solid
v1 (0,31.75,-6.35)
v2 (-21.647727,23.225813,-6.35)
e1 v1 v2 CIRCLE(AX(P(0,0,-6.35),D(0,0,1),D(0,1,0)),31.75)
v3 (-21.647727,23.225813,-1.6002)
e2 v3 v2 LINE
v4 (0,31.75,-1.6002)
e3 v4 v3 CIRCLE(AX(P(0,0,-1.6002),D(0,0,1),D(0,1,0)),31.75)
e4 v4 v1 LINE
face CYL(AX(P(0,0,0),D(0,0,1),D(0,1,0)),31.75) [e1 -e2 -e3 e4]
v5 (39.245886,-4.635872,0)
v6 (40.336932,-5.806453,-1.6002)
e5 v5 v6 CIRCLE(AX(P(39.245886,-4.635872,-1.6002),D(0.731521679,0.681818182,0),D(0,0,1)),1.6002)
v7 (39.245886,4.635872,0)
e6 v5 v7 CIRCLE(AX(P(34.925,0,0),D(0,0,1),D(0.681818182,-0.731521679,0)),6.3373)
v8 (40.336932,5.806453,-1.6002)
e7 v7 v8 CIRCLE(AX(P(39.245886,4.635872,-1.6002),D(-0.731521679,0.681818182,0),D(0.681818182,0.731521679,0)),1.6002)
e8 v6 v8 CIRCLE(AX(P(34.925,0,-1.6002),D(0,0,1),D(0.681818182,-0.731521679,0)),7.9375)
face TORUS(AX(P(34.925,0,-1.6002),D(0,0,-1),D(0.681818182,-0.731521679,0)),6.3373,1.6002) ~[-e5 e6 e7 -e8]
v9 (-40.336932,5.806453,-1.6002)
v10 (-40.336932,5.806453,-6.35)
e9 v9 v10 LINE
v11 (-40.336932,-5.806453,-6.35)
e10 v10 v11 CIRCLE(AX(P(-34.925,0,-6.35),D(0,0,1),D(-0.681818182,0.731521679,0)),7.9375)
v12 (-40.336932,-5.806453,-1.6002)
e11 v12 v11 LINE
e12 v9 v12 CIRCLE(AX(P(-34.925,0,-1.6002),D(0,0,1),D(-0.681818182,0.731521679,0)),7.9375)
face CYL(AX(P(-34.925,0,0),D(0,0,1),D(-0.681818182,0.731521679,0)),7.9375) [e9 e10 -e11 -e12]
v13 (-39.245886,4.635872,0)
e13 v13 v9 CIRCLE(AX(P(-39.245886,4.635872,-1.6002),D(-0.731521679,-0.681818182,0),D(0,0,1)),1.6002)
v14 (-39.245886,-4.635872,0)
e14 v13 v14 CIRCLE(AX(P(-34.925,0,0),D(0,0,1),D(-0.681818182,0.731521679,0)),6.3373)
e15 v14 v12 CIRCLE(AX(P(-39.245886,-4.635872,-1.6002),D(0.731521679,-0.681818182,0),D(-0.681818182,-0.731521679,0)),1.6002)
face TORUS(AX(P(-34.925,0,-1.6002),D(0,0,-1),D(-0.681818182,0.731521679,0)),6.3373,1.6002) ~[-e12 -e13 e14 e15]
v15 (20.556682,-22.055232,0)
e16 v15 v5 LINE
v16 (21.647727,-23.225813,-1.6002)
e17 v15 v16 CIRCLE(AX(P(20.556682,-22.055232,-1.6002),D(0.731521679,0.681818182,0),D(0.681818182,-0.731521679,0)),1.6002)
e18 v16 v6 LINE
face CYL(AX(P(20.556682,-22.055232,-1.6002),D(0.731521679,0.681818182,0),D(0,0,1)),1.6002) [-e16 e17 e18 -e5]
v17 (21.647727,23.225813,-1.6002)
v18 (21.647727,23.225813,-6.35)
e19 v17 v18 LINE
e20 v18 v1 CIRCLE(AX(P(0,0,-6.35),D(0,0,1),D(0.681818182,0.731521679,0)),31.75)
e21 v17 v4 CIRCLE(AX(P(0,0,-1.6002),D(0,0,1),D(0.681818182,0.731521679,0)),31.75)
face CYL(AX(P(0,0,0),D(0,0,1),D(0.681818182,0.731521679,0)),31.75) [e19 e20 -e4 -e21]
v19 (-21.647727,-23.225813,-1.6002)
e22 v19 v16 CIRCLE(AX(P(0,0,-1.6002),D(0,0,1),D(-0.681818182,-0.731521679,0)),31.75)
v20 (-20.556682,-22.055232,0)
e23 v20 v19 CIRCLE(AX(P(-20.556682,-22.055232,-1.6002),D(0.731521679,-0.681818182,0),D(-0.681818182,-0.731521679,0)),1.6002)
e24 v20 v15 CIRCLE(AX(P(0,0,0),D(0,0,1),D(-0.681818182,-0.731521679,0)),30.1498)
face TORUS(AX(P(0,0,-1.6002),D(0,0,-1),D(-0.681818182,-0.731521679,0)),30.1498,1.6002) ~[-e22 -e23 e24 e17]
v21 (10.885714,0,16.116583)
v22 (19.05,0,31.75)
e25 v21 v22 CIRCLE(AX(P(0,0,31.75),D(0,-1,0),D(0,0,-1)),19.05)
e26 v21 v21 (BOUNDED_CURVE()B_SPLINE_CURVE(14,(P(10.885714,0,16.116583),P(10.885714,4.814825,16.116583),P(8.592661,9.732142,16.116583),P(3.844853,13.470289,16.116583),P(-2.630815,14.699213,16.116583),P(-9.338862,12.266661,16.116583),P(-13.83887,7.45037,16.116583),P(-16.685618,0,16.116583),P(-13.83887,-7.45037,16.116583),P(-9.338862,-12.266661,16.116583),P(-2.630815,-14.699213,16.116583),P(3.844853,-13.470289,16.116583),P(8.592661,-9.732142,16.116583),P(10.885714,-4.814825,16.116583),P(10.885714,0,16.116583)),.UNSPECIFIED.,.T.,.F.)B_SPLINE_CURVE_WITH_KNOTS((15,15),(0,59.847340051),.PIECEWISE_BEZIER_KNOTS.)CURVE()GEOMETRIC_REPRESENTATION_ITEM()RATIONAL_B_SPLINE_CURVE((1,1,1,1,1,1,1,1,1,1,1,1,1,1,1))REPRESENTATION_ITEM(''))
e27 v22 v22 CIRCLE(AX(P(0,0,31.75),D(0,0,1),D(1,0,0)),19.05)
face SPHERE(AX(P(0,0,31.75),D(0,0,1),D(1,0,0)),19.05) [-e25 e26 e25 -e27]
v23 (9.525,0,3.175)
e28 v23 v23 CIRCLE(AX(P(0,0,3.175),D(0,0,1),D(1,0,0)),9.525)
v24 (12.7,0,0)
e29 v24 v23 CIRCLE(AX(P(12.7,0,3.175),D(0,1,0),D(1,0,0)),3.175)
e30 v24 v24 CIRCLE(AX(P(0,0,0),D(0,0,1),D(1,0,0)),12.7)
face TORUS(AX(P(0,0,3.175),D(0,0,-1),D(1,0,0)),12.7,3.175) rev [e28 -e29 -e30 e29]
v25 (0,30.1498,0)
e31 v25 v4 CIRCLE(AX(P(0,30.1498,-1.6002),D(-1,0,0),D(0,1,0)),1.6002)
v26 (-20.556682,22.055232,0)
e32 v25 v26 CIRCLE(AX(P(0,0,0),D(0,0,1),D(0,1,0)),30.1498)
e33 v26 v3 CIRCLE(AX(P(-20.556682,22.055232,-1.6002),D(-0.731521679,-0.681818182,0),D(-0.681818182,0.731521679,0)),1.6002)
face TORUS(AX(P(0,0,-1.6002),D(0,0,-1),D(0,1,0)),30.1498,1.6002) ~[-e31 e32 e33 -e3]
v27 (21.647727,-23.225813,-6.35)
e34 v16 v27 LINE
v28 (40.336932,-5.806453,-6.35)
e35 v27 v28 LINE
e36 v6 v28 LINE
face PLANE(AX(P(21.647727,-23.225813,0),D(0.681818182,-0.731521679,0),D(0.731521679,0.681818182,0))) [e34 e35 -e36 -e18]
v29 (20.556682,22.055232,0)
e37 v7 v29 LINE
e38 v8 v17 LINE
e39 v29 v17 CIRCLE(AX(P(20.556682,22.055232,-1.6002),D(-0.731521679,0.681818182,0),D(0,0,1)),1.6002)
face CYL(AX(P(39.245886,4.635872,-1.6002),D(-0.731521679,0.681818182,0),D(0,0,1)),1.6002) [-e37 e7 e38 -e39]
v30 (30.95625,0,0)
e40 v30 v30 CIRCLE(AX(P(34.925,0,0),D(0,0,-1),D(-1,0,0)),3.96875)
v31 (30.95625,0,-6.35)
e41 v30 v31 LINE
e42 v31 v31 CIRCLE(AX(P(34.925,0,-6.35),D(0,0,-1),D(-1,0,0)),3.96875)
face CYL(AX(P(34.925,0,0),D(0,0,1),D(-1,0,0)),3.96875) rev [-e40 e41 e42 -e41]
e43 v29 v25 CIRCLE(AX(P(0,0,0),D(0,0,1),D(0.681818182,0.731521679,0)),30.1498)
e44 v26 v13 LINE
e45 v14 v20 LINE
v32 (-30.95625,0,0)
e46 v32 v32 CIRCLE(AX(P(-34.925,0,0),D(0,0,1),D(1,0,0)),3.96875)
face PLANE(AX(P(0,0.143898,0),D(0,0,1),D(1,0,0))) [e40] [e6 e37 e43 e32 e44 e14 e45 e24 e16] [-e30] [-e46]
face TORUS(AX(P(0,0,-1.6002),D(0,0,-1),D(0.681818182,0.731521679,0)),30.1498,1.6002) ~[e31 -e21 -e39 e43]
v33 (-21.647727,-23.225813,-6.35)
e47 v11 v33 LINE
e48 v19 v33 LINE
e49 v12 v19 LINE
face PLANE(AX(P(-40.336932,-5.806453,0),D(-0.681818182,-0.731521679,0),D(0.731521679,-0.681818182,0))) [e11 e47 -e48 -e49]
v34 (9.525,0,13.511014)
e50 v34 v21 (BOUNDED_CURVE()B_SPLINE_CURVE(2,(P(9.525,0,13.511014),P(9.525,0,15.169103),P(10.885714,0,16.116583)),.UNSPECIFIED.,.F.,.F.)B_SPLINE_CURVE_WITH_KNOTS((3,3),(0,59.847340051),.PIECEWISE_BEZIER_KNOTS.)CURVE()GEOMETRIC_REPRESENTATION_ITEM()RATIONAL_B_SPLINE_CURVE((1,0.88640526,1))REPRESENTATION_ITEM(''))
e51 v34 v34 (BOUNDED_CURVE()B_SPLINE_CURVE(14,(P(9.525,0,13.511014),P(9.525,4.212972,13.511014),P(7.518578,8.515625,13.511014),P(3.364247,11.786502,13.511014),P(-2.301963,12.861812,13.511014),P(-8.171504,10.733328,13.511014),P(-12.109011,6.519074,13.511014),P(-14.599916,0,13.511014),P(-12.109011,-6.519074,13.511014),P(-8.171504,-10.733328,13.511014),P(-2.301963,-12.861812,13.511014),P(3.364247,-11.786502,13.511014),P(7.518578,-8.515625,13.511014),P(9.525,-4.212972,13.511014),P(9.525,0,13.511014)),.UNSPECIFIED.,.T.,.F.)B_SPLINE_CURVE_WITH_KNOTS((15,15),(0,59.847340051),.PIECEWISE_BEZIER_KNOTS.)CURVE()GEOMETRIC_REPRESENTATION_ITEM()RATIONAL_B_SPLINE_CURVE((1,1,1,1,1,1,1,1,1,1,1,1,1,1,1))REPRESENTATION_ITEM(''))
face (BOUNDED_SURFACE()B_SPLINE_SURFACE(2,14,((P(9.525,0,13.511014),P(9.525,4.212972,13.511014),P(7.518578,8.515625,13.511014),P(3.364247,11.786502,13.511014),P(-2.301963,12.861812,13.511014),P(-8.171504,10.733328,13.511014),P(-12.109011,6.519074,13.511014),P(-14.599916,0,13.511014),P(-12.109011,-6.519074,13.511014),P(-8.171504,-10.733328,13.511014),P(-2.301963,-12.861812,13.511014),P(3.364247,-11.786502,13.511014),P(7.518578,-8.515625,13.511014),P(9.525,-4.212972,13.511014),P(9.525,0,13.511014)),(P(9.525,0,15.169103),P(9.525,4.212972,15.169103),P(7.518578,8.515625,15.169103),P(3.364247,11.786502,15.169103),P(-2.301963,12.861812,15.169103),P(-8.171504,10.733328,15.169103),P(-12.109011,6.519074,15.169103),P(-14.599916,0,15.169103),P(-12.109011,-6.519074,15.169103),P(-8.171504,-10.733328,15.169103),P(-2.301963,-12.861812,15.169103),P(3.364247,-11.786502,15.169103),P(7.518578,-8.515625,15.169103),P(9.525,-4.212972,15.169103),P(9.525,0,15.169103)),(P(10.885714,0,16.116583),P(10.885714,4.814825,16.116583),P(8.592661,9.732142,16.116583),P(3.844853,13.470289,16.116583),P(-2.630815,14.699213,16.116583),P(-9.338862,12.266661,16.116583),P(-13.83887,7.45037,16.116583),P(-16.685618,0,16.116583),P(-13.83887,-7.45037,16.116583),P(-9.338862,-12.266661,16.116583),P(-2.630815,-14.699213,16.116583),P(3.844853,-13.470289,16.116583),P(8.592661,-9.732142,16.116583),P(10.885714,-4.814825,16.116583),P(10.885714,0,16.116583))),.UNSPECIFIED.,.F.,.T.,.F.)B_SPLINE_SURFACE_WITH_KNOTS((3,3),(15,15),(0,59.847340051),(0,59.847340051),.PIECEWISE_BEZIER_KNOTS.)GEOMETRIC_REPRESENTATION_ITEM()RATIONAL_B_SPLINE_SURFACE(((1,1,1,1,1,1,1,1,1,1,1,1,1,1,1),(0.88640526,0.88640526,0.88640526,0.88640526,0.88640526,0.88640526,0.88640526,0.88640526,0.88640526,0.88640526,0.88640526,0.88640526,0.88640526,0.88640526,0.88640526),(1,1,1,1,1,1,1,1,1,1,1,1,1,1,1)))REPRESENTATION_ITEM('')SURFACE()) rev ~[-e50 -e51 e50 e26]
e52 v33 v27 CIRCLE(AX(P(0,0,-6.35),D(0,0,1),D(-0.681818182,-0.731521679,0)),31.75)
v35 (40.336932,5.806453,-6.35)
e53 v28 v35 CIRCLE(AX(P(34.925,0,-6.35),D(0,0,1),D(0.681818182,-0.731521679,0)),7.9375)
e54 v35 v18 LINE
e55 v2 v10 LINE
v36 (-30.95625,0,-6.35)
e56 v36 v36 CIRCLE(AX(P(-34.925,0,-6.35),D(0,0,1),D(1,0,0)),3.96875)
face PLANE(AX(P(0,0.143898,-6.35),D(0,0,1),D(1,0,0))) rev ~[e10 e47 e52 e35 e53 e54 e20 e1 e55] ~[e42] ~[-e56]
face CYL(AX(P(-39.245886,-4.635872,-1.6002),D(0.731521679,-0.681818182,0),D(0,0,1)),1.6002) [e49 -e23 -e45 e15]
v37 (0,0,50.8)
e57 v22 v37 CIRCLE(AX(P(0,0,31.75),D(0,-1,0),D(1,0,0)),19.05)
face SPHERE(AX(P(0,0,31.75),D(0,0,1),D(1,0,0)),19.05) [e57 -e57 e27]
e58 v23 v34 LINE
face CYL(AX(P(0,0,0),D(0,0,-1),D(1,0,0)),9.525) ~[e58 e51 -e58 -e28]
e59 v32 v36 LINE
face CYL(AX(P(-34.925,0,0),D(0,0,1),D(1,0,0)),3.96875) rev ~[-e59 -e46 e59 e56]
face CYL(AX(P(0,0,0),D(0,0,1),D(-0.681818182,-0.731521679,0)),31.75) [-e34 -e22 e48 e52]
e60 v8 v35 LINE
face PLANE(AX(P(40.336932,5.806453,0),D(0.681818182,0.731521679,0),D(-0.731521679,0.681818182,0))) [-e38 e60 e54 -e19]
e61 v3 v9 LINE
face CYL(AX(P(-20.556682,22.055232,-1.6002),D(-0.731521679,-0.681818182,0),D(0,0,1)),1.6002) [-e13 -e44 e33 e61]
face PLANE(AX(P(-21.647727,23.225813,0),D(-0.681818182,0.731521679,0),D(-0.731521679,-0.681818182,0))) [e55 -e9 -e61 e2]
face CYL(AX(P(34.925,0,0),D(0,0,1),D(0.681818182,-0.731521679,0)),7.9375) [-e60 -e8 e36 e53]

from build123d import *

# Parameters (mm, degrees)
F0_R     = 3.96875
F1_DEPTH = 6.35
F4_DEPTH = 15.2522160579
F5_R     = 1.6002
F6_R     = 3.175


with BuildPart() as f1:
    # F0 (on Top) → F1 (new body)
    with BuildSketch(Plane.XY):
        with BuildLine():
            Line((40.3369318182, 5.8064533276), (21.6477272727, 23.2258133103))
            ThreePointArc((21.6477272727, 23.2258133103), (11.6327754082, 29.5421907837), (0, 31.75))
            ThreePointArc((0, 31.75), (-11.6327754082, 29.5421907837), (-21.6477272727, 23.2258133103))
            Line((-21.6477272727, 23.2258133103), (-40.3369318182, 5.8064533276))
            ThreePointArc((-40.3369318182, 5.8064533276), (-42.8625, 0), (-40.3369318182, -5.8064533276))
            Line((-40.3369318182, -5.8064533276), (-21.6477272727, -23.2258133103))
            ThreePointArc((-21.6477272727, -23.2258133103), (0, -31.75), (21.6477272727, -23.2258133103))
            Line((21.6477272727, -23.2258133103), (40.3369318182, -5.8064533276))
            ThreePointArc((40.3369318182, -5.8064533276), (42.8625, 0), (40.3369318182, 5.8064533276))
        make_face()
        with Locations((-34.925, 0)):
            Circle(F0_R, mode=Mode.SUBTRACT)
        with BuildLine():
            ThreePointArc((9.525, 0), (-6.7351920908, -6.7351920908), (0, 9.525))
            ThreePointArc((0, 9.525), (6.7351920908, 6.7351920908), (9.525, 0))
        make_face(mode=Mode.SUBTRACT)
        with BuildLine():
            ThreePointArc((38.89375, 0), (34.925, -3.96875), (30.95625, 0))
            ThreePointArc((30.95625, 0), (34.925, 3.96875), (38.89375, 0))
        make_face(mode=Mode.SUBTRACT)
        with BuildLine():
            Line((0, 0), (0, 9.525))
            ThreePointArc((0, 9.525), (-6.7351920908, -6.7351920908), (9.525, 0))
            Line((9.525, 0), (0, 0))
        make_face()
        with BuildLine():
            ThreePointArc((9.525, 0), (6.7351920908, 6.7351920908), (0, 9.525))
            Line((0, 9.525), (0, 0))
            Line((0, 0), (9.525, 0))
        make_face()
    extrude(amount=-F1_DEPTH)



with BuildPart() as f3:
    # F2 (on Front) → F3 (revolve)
    with BuildSketch(Plane.XZ):
        with BuildLine():
            Line((0, 50.8), (0, 12.7))
            ThreePointArc((0, 12.7), (13.4703841816, 18.2796158184), (19.05, 31.75))
            ThreePointArc((19.05, 31.75), (13.4703841816, 45.2203841816), (0, 50.8))
        make_face()
    revolve(axis=Axis((0, 0, 25.4), (0, 0, 1)))


with BuildPart() as f1_1:
    add(f1.part)

    add(f3.part)  # F4 merges F3
    # F0 (on Top) → F4 (join, through all)
    with BuildSketch(Plane.XY):
        with BuildLine():
            Line((0, 0), (0, 9.525))
            ThreePointArc((0, 9.525), (-6.7351920908, -6.7351920908), (9.525, 0))
            Line((9.525, 0), (0, 0))
        make_face()
        with BuildLine():
            ThreePointArc((9.525, 0), (6.7351920908, 6.7351920908), (0, 9.525))
            Line((0, 9.525), (0, 0))
            Line((0, 0), (9.525, 0))
        make_face()
    extrude(amount=F4_DEPTH)

    # F5
    f5_edges = [f1_1.edges().sort_by_distance(p)[0] for p in [
        (0, -31.75, 0),
        (42.8625, 0, 0),
        (30.99233, -14.516133, 0),
        (30.99233, 14.516133, 0),
        (0, 31.75, 0),
        (-30.99233, -14.516133, 0),
        (-30.99233, 14.516133, 0),
        (-42.8625, 0, 0),
    ]]
    fillet(f5_edges, radius=F5_R)

    # F6
    f6_edges = [f1_1.edges().sort_by_distance(p)[0] for p in [
        (-9.525, 0, 15.252216),
        (-9.525, 0, 0),
    ]]
    fillet(f6_edges, radius=F6_R)


solid = f1_1.part
